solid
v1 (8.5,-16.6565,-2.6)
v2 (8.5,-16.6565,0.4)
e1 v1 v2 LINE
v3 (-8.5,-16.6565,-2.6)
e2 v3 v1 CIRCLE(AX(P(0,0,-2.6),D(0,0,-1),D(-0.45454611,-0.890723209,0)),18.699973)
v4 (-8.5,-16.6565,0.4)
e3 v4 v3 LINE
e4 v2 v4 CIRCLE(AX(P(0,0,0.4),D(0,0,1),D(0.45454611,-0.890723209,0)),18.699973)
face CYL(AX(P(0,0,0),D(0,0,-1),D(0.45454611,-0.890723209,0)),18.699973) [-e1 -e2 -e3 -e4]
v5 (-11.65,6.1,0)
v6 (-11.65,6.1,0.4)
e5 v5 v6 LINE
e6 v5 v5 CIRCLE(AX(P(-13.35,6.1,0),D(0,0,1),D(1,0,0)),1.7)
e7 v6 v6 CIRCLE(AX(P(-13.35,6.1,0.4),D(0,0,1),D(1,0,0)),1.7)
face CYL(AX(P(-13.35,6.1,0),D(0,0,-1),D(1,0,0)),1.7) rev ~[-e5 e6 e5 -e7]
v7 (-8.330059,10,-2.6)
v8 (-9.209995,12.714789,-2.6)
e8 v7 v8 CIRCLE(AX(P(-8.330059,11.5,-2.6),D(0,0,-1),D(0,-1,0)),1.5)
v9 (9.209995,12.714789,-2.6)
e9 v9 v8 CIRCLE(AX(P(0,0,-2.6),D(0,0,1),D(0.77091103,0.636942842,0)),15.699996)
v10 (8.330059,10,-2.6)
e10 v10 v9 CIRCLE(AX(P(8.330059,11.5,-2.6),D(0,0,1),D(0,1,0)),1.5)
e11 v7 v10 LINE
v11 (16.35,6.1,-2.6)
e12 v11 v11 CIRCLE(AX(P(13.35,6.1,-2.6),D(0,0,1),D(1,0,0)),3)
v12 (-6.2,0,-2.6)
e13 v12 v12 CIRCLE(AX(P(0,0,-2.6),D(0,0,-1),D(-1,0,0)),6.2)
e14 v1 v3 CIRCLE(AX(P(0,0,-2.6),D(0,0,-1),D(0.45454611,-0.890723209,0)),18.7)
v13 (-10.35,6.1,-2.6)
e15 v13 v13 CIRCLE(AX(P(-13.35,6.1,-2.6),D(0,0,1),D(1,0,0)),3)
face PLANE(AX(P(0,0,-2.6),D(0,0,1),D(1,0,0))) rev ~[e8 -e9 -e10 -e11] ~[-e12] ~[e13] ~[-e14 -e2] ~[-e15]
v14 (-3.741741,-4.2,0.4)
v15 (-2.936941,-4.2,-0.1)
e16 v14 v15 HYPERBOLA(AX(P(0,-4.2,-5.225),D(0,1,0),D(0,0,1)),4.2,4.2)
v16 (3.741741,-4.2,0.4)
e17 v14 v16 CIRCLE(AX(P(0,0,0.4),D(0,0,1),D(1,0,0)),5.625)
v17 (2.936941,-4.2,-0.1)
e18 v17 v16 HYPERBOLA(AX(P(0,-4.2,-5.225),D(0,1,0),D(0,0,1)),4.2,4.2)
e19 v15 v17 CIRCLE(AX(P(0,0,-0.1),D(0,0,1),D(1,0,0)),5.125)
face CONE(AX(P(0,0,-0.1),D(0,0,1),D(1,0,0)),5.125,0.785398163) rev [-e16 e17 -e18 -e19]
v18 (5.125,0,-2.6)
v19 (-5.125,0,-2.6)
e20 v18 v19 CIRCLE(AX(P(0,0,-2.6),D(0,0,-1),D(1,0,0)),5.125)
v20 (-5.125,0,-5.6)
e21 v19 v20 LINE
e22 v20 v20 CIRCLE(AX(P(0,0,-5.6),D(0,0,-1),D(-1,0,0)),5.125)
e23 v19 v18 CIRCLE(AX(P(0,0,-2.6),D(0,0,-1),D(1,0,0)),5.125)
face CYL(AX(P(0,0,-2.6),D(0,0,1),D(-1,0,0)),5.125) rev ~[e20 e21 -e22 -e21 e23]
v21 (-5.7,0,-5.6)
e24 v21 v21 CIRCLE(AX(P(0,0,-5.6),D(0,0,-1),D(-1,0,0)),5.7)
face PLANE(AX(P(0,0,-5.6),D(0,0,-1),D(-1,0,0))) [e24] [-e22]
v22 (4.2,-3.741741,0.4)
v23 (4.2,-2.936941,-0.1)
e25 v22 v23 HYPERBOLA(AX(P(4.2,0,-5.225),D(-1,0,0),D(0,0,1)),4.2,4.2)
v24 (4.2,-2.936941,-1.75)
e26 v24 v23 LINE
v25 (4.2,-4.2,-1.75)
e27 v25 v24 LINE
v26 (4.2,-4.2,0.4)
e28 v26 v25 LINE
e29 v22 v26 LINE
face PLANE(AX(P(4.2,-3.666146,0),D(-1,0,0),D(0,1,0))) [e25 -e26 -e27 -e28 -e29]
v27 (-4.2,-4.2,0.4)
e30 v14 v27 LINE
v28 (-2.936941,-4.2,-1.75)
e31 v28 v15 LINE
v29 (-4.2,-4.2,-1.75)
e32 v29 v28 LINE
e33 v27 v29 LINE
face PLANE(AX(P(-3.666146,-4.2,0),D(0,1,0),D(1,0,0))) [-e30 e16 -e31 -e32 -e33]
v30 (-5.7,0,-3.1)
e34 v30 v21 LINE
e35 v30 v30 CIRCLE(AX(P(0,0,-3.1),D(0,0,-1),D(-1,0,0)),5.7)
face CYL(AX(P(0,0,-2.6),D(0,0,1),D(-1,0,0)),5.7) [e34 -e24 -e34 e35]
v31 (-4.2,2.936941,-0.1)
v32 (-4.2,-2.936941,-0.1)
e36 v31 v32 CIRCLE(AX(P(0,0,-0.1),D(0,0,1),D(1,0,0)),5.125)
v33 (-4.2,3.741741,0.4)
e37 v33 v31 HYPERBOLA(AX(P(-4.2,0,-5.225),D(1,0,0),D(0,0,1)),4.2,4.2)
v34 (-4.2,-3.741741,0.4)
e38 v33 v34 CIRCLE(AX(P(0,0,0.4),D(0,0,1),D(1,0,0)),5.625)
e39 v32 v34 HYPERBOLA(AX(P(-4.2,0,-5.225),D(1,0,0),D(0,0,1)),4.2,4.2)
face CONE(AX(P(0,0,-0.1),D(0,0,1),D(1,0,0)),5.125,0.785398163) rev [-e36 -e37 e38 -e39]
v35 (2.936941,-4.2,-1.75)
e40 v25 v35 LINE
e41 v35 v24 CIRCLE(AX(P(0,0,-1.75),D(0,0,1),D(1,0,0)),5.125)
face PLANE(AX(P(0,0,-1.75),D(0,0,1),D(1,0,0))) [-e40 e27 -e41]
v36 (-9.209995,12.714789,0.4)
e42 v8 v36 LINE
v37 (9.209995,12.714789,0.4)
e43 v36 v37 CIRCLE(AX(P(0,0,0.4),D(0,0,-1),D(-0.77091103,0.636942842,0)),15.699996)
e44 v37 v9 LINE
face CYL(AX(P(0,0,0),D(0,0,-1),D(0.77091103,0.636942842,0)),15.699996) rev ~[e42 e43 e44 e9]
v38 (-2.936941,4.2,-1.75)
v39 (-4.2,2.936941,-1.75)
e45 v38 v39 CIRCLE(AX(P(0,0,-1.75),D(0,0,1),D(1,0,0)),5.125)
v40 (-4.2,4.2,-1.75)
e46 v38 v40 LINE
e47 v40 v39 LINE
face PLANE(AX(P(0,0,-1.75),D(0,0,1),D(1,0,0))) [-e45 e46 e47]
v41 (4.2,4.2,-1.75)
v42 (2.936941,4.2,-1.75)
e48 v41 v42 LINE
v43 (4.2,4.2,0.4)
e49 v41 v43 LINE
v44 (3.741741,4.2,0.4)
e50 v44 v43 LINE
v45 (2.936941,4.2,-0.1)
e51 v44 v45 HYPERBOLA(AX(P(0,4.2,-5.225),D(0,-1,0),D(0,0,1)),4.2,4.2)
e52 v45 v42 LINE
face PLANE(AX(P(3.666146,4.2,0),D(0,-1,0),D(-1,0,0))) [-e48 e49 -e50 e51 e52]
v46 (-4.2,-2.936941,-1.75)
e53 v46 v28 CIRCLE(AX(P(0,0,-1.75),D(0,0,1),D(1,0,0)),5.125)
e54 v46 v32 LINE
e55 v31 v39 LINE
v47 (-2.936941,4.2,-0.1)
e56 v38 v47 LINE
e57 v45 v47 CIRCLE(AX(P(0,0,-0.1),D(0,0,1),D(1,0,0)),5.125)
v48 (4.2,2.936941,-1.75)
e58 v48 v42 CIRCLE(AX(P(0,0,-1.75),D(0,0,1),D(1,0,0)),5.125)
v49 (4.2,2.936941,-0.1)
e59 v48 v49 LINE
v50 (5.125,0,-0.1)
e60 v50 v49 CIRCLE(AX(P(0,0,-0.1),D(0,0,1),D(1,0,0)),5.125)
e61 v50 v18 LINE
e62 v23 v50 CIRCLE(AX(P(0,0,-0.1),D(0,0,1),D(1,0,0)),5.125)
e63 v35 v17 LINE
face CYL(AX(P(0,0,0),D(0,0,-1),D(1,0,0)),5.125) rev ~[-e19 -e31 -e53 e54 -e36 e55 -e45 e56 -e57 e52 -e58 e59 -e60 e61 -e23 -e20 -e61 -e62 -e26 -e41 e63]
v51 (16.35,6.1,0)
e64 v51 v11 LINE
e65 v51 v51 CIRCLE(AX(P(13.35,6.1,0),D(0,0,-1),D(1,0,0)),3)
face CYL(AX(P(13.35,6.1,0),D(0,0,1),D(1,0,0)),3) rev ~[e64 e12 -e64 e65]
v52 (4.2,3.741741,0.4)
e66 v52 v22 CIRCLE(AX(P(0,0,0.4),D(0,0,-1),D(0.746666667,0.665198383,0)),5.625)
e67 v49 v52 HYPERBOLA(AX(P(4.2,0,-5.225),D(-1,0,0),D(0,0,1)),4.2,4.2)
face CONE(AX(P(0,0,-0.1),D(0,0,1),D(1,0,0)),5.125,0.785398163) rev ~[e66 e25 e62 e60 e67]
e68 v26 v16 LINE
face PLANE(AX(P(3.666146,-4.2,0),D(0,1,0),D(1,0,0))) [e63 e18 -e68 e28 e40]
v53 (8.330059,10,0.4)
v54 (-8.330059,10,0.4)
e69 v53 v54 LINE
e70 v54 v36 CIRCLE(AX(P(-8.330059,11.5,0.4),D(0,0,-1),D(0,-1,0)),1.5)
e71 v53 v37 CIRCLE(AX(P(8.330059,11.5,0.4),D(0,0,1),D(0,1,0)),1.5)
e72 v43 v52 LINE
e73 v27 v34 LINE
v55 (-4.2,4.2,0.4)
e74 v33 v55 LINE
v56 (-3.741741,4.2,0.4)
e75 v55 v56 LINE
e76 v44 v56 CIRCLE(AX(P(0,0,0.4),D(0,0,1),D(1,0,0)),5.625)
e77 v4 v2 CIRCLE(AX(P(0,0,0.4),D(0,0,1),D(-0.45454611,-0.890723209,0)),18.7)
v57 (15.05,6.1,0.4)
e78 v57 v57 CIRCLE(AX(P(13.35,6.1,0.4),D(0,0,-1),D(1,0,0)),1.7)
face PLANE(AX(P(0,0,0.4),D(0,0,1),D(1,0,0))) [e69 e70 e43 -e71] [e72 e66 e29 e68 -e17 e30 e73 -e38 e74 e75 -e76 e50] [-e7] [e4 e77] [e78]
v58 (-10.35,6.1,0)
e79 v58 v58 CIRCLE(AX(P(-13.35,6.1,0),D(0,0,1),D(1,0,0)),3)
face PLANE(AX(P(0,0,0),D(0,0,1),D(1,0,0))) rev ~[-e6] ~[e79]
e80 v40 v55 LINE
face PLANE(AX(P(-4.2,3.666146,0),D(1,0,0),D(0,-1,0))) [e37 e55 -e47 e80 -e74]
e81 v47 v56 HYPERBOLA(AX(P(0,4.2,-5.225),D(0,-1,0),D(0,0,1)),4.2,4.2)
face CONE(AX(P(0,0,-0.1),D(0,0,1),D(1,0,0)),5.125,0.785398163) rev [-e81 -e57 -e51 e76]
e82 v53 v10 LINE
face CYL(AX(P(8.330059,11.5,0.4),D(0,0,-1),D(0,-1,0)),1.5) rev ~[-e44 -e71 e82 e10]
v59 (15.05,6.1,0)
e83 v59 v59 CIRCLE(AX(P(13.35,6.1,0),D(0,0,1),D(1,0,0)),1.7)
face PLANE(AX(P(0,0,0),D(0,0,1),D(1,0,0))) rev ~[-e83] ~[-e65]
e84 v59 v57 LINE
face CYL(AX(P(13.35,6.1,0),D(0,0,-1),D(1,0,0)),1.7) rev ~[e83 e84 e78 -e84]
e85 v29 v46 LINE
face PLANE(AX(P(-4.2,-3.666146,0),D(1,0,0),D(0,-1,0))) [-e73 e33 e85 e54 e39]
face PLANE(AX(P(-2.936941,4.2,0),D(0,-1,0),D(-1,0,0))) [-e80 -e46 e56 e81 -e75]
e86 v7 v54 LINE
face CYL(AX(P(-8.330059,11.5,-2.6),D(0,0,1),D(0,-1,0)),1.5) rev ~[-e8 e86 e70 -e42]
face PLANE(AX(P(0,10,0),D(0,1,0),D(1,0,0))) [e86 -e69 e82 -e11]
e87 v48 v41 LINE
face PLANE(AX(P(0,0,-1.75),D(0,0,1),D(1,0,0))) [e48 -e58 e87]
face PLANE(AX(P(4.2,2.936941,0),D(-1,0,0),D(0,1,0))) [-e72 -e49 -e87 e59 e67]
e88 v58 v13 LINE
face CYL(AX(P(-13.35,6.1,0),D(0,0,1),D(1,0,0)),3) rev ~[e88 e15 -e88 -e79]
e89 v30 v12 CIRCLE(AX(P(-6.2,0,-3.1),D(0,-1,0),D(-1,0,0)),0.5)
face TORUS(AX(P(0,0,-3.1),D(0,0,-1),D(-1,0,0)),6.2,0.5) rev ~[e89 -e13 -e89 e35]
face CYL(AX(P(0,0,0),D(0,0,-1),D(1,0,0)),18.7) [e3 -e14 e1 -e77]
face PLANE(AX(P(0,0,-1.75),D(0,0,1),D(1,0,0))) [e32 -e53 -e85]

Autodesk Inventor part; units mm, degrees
ref_plane "YZ Plane" through (0, 0, 0) normal (1, 0, 0) x (0, 1, 0)
ref_plane "XZ Plane" through (0, 0, 0) normal (0, 1, 0) x (-1, 0, 0)
ref_plane "XY Plane" through (0, 0, 0) normal (0, 0, 1) x (1, 0, 0)
sketch "Náčrt1" plane through (0, 0, 0) normal (0, 0, 1) x (1, 0, 0)
  circle A0 centre (0, 0) radius 5.125
  arc A1 (8.5, -16.6565) -> (-8.5, -16.6565) centre (0, 0) ccw
  line L0 (-13.35, 6.1) -> (13.35, 6.1)
  line L1 (0, 18.7) -> (0, -18.7)
  line L2 (8.5, -16.6565) -> (8.5, -22.2)
  line L3 (8.5, -22.2) -> (-8.5, -22.2)
  line L4 (-8.5, -22.2) -> (-8.5, -16.6565)
  line L5 (0, -18.7) -> (8.5, -22.2) construction
  line L6 (0, -18.7) -> (-8.5, -22.2) construction
  circle A2 centre (-13.35, 6.1) radius 1.7
  circle A3 centre (13.35, 6.1) radius 1.7
  line L7 (-12.1033, 10) -> (12.1033, 10)
  arc A4 (12.1033, 10) -> (-12.1033, 10) centre (0, 0) ccw
  line L8 (4.2, 4.2) -> (-4.2, 4.2)
  line L9 (-4.2, 4.2) -> (-4.2, -4.2)
  line L10 (-4.2, -4.2) -> (4.2, -4.2)
  line L11 (4.2, -4.2) -> (4.2, 4.2)
  line L12 (4.2, 4.2) -> (-4.2, -4.2) construction
  line L13 (-4.2, 4.2) -> (4.2, -4.2) construction
  line L14 (-3.55, -20.2) -> (3.55, -20.2)
  line L15 (3.55, -20.2) -> (3.55, -17.1)
  line L16 (3.55, -17.1) -> (-3.55, -17.1)
  line L17 (-3.55, -17.1) -> (-3.55, -20.2)
  line L18 (-3.55, -20.2) -> (3.55, -17.1) construction
  line L19 (3.55, -20.2) -> (-3.55, -17.1) construction
  circle A5 centre (0, 0) radius 5.575
  circle A6 centre (0, 0) radius 18.7
  circle A7 centre (-13.35, 6.1) radius 3
  circle A8 centre (13.35, 6.1) radius 3
  point P0 (-10.088, 6.1)
  point P1 (4.2, -2.9369)
  point P2 (2.9369, -4.2)
  point P3 (-2.9369, -4.2)
  point P4 (-4.2, -2.9369)
  point P5 (-4.2, 2.9369)
  point P6 (-2.9369, 4.2)
  point P7 (4.2, 2.9369)
  point P8 (2.9369, 4.2)
  point P9 (0, -18.65)
  point P10 (-8.5, -16.6565)
  dimension "d0" = 10.25
  dimension "d1" = 37.4
  dimension "d2" = 26.7
  dimension "d3" = 17
  dimension "d5" = 22.2
  dimension "d7" = 6.1
  dimension "d9" = 3.4
  dimension "d10" = 3.4
  dimension "d12" = 10
  dimension "d14" = 3
  dimension "d25" = 8.4
  dimension "d26" = 8.4
  dimension "d31" = 3.1
  dimension "d32" = 7.1
  dimension "d33" = 2
  dimension "d39" = 0.45
  dimension "d40" = 6
  dimension "d41" = 6
extrude "Vysunutí1" add sketch "Náčrt1" along normal blind 0.4 contours A0 L11 A5 | A0 L8 A5 L11 | L11 A5 L10 A0 | A0 L1 A5 L8 | A5 L8 L11 | L11 L8 A5 L1 L7 A4 A1 A6 L15 L16 L10 | L10 A5 L1 A0 | L11 L10 A5 | A0 L8 A5 L1 | L1 A5 L10 A0 | A0 L9 A5 L8 | A5 L8 L9 L10 L1 L16 L17 A6 A1 A4 L7 | L10 A5 L9 A0 | A0 L9 A5 | A5 L9 L8 | L10 L9 A5 | L16 L15 A6 L1 | L1 A6 L17 L16 | A7 | A8
extrude "Vysunutí2" add sketch "Náčrt1" against normal blind 2.6 contours A0 L11 A5 | A0 L8 A5 L11 | L11 A5 L10 A0 | A0 L1 A5 L8 | A5 L8 L11 | L11 L8 A5 L1 L7 A4 A1 A6 L15 L16 L10 | L10 A5 L1 A0 | L11 L10 A5 | A0 L8 A5 L1 | L1 A5 L10 A0 | A0 L9 A5 L8 | A5 L8 L9 L10 L1 L16 L17 A6 A1 A4 L7 | L10 A5 L9 A0 | A0 L9 A5 | A5 L9 L8 | L10 L9 A5 | L16 L15 A6 L1 | L1 A6 L17 L16
fillet "Zaoblení1" radius 1.5 4 edges at (12.1033, 10, 0.2) (12.1033, 10, -1.3) (-12.1033, 10, 0.2) (-12.1033, 10, -1.3)
chamfer "Zkosení1" distance 0.5 angle 45 1 edges at (-5.125, 0, 0.4)
extrude "Vysunutí3" cut sketch "Náčrt1" along normal blind 0.75 and the other way blind 1.75 contours A0 L8 A5 L11 | L11 A5 L10 A0 | A5 L8 L11 | L11 L10 A5 | A0 L9 A5 L8 | L10 A5 L9 A0 | A5 L9 L8 | L10 L9 A5
sketch "Náčrt2" plane through (0, 0, -2.6) normal (0, 0, -1) x (-1, 0, 0)
  circle A0 centre (0, 0) radius 5.125 projected
  circle A1 centre (0, 0) radius 5.7
  dimension "d35" = 11.4
extrude "Vysunutí4" add sketch "Náčrt2" along normal blind 3
fillet "Zaoblení4" radius 0.5 1 edges at (5.7, 0, -2.6)
properties part number "Držák-Cam+ir"
